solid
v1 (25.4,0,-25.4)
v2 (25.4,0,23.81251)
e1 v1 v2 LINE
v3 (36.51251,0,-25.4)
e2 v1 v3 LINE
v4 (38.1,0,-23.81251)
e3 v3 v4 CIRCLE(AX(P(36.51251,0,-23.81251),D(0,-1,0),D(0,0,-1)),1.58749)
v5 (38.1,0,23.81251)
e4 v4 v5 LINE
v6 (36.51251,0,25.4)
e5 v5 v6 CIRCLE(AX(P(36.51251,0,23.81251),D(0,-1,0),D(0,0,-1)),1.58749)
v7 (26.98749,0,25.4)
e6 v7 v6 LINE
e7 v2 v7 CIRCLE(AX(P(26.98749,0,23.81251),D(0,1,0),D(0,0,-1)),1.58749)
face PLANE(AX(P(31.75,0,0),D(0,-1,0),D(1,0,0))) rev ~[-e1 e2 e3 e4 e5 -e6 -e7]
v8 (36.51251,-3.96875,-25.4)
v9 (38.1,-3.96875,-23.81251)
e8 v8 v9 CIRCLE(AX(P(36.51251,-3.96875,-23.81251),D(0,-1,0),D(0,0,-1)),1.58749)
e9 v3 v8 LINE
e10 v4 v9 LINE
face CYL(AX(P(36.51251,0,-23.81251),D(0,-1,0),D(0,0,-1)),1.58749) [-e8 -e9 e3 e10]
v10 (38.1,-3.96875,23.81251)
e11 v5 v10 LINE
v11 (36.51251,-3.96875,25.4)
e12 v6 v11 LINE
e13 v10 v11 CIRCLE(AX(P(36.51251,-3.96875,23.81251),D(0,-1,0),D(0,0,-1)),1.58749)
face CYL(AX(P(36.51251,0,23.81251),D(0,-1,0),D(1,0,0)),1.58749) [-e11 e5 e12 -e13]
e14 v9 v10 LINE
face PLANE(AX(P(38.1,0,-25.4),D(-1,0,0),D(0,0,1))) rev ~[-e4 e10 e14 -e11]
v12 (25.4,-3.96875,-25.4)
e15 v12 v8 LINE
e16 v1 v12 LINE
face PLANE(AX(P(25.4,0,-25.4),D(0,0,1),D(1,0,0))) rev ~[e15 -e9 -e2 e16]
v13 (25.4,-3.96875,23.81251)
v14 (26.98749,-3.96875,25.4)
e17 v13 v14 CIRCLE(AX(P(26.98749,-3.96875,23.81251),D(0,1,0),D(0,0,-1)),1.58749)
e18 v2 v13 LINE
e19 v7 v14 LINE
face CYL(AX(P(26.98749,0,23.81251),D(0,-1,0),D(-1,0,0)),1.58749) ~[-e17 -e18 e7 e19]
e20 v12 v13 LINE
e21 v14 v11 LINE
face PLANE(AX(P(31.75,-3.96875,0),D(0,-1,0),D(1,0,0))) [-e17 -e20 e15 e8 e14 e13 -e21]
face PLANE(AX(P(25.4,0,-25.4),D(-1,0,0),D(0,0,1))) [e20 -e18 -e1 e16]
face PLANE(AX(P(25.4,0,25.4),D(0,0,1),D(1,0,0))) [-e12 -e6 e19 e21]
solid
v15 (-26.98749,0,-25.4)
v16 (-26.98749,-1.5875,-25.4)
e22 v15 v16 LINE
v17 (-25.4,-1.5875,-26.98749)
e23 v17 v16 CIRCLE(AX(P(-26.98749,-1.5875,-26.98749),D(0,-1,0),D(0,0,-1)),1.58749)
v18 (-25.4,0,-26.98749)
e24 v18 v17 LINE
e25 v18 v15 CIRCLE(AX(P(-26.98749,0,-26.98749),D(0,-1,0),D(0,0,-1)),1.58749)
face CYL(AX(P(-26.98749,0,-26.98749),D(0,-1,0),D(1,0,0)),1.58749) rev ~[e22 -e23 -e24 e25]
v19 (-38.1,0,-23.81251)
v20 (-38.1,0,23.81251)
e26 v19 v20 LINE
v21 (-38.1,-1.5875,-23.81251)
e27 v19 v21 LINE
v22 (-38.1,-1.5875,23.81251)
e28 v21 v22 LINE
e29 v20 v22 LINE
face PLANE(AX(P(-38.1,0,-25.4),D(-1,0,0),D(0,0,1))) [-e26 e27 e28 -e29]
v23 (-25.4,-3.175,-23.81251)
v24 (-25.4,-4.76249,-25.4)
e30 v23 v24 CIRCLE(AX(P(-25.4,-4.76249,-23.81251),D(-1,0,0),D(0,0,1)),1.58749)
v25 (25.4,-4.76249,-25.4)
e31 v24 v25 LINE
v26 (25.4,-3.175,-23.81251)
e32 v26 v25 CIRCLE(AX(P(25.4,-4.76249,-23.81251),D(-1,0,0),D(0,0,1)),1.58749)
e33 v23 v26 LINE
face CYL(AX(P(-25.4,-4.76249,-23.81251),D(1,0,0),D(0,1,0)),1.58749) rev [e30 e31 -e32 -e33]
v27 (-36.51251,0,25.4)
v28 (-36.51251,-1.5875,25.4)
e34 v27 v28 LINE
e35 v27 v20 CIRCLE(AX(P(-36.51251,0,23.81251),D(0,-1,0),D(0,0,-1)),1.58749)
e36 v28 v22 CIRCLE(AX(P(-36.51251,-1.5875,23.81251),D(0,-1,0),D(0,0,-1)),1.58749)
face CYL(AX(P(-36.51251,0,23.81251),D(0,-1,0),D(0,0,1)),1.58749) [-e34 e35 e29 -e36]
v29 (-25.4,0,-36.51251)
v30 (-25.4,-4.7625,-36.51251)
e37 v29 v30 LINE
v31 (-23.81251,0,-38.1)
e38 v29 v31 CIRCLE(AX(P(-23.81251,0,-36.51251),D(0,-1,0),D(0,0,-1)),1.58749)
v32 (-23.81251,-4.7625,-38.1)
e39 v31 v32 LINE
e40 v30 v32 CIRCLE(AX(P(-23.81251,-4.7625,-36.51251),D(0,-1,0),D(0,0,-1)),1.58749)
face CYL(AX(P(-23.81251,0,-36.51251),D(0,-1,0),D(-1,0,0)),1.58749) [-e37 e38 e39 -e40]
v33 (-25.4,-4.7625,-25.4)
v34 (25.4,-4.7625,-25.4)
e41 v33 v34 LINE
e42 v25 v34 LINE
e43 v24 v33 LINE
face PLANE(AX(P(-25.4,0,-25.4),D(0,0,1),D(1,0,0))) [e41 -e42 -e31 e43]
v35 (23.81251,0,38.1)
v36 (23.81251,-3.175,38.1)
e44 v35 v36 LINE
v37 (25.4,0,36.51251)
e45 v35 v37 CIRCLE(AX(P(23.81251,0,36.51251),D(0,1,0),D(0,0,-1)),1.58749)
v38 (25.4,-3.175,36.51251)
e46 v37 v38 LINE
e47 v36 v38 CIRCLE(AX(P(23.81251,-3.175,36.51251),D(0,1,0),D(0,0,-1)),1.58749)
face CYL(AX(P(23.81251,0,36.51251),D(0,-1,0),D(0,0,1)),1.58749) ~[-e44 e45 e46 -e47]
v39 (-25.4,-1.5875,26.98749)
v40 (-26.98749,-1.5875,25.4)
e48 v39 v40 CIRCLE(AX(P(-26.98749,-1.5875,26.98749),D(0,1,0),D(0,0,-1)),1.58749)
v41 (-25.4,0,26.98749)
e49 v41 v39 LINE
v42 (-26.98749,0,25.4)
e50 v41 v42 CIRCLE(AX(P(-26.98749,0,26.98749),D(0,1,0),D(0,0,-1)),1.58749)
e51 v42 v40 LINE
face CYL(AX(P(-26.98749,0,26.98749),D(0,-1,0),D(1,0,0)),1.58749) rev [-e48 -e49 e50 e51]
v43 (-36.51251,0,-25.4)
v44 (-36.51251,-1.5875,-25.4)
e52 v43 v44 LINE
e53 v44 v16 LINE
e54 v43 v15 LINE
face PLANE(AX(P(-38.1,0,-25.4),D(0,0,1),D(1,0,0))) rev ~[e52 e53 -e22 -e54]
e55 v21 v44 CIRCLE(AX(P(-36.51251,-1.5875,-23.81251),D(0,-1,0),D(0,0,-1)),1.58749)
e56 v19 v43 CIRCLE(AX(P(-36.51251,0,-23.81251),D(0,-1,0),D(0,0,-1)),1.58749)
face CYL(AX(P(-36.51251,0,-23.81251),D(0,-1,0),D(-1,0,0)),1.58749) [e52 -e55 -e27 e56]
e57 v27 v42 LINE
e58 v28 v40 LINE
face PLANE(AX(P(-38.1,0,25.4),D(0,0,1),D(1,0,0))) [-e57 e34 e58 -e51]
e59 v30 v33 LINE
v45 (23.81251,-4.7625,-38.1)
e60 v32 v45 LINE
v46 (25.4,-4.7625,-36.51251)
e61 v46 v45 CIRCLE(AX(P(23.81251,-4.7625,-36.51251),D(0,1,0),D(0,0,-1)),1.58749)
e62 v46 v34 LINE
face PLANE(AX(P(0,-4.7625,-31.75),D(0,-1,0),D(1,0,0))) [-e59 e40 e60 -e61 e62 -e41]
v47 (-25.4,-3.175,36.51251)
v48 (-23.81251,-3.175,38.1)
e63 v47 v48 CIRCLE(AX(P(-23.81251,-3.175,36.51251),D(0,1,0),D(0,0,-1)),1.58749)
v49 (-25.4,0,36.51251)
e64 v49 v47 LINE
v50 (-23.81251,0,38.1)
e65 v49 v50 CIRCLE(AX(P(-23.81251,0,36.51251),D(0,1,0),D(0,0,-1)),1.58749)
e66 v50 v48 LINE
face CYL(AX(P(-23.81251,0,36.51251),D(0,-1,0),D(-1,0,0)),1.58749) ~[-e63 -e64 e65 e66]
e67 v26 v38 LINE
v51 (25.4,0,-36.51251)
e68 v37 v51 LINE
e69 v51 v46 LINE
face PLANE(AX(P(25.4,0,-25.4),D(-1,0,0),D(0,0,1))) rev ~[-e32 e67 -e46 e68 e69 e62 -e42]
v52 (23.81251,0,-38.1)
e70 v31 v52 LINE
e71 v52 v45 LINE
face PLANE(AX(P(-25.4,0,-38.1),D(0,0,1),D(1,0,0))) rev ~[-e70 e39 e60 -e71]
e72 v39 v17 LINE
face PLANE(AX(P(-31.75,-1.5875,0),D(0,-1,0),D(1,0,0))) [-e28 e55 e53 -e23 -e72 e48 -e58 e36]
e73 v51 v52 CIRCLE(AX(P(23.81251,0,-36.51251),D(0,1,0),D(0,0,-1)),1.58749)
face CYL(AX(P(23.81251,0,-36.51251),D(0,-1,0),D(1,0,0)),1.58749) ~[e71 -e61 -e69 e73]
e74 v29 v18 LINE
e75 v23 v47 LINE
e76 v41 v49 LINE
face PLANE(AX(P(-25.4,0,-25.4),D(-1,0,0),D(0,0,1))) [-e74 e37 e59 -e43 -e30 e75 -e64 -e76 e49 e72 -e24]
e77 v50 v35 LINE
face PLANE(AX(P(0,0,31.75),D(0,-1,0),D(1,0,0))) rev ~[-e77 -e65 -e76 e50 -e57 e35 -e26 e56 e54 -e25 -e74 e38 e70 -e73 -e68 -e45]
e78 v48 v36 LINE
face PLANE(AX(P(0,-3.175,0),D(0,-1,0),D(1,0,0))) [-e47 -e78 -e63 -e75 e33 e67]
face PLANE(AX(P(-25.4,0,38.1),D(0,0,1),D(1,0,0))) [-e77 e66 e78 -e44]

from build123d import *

# Parameters (mm, degrees)
F0_W     = 50.8
F0_H     = 12.7
F1_DEPTH = 3.175
F0_W_2   = 12.7
F0_H_2   = 50.8
F2_DEPTH = 3.96875
F3_DEPTH = 4.7625
F4_DEPTH = 1.5875
F5_DEPTH = 3.175
F6_R     = 1.58749
F6_2_R   = 1.58749


# Not quite as in the source:
# - a fillet or chamfer is up to 0.001 mm smaller than in the source, because OpenCascade refuses the exact size


with BuildPart() as f1:
    # F0 (on Front) → F1 (new body)
    with BuildSketch(Plane.XZ):
        with Locations((0, 31.75)):
            Rectangle(F0_W, F0_H)
    extrude(amount=F1_DEPTH)



with BuildPart() as f2:
    # F0 (on Front) → F2 (new body)
    with BuildSketch(Plane.XZ):
        with Locations((31.75, 0)):
            Rectangle(F0_W_2, F0_H_2)
    extrude(amount=F2_DEPTH)

    # F6#2 (radius 1.5875 in the source; OpenCascade refuses exactly that, so slightly less here)
    f6_2_edges = [f2.edges().sort_by_distance(p)[0] for p in [
        (38.1, -1.984375, -25.4),
        (25.4, -1.984375, 25.4),
        (38.1, -1.984375, 25.4),
    ]]
    fillet(f6_2_edges, radius=F6_2_R)


with BuildPart() as f3:
    # F0 (on Front) → F3 (new body)
    with BuildSketch(Plane.XZ):
        with Locations((0, -31.75)):
            Rectangle(F0_W, F0_H)
    extrude(amount=F3_DEPTH)


with BuildPart() as f1_1:
    add(f1.part)

    add(f3.part)  # F4 merges F3
    # F0 (on Front) → F4 (join)
    with BuildSketch(Plane.XZ):
        with Locations((-31.75, 0)):
            Rectangle(F0_W_2, F0_H_2)
    extrude(amount=F4_DEPTH)

    # F0 (on Front) → F5 (join)
    with BuildSketch(Plane.XZ):
        Rectangle(F0_W, F0_H_2)
    extrude(amount=F5_DEPTH)

    # F6 (radius 1.5875 in the source; OpenCascade refuses exactly that, so slightly less here)
    f6_edges = [f1_1.edges().sort_by_distance(p)[0] for p in [
        (-25.4, -2.38125, -38.1),
        (25.4, -2.38125, -38.1),
        (-38.1, -0.79375, -25.4),
        (-38.1, -0.79375, 25.4),
        (-25.4, -0.79375, 25.4),
        (-25.4, -1.5875, 38.1),
        (25.4, -1.5875, 38.1),
        (-25.4, -0.79375, -25.4),
        (0, -3.175, -25.4),
    ]]
    fillet(f6_edges, radius=F6_R)


solid = Compound([f2.part, f1_1.part])
